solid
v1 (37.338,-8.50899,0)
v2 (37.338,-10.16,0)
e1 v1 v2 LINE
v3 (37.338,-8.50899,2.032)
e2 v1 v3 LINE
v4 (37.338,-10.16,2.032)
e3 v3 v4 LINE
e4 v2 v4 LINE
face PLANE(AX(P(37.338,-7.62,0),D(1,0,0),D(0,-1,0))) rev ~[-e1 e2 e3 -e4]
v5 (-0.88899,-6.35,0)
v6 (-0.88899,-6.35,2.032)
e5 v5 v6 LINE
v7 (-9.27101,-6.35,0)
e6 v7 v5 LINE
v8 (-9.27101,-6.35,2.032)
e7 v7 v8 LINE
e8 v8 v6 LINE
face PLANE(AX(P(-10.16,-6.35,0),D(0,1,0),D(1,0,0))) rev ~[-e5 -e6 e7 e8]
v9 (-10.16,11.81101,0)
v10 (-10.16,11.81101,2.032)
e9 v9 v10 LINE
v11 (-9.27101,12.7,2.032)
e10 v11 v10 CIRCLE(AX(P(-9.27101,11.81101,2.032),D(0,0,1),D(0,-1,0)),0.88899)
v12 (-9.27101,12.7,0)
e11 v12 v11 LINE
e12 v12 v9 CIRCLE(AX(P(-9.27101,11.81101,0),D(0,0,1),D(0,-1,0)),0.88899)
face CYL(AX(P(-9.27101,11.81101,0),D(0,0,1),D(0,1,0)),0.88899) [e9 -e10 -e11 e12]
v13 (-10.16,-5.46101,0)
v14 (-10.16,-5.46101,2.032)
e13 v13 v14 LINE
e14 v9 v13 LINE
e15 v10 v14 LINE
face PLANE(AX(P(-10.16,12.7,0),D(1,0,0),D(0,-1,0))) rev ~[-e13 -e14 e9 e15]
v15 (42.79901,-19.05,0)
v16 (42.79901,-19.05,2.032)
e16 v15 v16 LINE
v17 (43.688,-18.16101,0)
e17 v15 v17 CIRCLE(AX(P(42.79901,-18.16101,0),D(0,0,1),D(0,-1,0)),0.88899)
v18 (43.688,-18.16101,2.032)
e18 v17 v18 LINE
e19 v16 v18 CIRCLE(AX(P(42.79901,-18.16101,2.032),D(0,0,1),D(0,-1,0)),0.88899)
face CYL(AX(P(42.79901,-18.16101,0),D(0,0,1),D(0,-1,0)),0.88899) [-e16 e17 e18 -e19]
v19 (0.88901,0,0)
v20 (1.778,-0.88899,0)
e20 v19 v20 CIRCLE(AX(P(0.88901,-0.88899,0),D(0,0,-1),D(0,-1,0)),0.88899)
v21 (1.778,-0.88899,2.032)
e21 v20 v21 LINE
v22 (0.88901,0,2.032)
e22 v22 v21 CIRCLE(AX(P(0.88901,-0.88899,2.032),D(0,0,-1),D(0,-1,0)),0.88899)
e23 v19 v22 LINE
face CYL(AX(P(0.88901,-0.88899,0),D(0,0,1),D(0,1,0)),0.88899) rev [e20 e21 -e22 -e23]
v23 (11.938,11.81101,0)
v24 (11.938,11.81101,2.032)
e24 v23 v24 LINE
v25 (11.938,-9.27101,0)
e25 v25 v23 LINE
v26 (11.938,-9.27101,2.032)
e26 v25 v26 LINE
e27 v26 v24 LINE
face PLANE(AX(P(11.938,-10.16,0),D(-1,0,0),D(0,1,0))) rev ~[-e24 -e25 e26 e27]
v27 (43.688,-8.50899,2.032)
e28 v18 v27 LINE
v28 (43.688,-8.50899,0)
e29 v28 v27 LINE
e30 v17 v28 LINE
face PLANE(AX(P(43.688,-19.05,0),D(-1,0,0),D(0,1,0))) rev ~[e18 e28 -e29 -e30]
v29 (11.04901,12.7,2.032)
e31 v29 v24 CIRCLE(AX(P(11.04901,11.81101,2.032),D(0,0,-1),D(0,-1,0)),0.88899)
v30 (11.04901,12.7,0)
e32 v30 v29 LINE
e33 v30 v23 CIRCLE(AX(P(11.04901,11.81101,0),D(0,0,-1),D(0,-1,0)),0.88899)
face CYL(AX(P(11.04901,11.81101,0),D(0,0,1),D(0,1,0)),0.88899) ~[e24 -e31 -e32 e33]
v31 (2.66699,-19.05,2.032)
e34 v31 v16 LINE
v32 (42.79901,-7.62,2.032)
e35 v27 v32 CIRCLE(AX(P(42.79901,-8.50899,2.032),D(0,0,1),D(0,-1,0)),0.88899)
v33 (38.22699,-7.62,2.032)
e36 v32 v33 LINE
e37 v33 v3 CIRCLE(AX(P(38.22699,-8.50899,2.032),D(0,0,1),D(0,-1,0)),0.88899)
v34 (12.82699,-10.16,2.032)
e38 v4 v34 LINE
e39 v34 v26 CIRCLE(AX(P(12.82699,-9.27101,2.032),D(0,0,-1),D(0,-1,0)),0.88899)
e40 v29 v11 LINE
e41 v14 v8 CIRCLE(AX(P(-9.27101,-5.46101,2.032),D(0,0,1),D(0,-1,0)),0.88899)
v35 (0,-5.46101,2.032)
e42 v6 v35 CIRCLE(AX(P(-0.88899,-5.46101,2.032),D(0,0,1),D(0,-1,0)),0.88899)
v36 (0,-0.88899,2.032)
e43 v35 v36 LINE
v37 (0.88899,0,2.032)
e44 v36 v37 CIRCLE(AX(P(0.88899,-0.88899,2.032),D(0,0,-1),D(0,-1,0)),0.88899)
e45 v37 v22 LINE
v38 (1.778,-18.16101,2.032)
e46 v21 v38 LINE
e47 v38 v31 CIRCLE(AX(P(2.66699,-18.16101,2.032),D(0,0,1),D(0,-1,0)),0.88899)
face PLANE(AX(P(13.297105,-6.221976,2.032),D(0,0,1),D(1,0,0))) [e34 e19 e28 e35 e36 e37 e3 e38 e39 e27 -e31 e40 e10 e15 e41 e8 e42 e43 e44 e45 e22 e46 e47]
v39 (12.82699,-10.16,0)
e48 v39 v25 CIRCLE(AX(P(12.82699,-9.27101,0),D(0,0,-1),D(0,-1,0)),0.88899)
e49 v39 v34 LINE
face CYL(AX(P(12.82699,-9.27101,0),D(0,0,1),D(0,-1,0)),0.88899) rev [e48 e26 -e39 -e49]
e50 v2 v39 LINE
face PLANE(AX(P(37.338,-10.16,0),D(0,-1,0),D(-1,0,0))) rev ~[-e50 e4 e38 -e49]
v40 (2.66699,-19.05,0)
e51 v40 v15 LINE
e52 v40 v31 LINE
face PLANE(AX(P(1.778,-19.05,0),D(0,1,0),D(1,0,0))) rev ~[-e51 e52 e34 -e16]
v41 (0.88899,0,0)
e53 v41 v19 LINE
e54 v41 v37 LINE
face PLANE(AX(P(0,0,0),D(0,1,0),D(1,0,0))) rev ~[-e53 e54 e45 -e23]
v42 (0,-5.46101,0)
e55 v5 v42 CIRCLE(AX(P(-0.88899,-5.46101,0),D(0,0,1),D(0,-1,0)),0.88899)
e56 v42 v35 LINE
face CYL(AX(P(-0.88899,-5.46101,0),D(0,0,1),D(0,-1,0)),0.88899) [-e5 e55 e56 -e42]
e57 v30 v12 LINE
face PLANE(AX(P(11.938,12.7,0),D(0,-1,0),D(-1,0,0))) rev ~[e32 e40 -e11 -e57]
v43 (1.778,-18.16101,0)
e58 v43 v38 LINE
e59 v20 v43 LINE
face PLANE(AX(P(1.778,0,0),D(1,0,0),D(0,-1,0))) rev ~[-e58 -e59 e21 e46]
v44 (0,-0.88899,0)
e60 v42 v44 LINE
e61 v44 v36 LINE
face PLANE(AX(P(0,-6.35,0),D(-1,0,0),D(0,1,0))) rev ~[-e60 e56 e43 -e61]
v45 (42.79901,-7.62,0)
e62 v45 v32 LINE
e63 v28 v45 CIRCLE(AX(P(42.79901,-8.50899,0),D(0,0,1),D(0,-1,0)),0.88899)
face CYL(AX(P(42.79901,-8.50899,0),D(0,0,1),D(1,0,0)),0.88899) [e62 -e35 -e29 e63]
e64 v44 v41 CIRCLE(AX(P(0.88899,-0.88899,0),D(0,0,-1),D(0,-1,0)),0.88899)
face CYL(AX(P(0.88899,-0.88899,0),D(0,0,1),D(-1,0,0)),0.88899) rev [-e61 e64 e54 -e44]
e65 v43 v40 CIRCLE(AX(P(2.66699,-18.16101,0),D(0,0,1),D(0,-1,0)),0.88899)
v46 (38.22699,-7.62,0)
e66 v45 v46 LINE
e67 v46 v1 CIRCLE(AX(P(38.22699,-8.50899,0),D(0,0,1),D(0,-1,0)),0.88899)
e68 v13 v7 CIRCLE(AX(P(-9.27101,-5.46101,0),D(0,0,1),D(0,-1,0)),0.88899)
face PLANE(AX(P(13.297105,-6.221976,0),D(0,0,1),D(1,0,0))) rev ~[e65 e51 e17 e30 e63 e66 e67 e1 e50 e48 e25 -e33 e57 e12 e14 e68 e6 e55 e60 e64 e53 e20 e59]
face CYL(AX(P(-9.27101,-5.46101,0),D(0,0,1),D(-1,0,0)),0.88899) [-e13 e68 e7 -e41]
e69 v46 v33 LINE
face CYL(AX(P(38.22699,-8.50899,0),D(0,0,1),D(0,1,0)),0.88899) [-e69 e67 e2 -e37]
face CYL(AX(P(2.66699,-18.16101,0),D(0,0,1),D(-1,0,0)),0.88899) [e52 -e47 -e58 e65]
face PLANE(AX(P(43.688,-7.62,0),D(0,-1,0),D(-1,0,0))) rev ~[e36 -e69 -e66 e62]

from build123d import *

# Parameters (mm, degrees)
F1_DEPTH = 2.032
F2_R     = 0.88899


# Not quite as in the source:
# - a fillet or chamfer is up to 0.001 mm smaller than in the source, because OpenCascade refuses the exact size


with BuildPart() as f1:
    # F0 (on Top) → F1 (new body)
    with BuildSketch(Plane.XY):
        Polygon((11.938, 12.7), (-10.16, 12.7), (-10.16, -6.35), (0, -6.35), (0, 0), (1.778, 0), (1.778, -19.05), (43.688, -19.05), (43.688, -7.62), (37.338, -7.62), (37.338, -10.16), (11.938, -10.16), align=None)
    extrude(amount=F1_DEPTH)

    # F2 (radius 0.889 in the source; OpenCascade refuses exactly that, so slightly less here)
    f2_edges = [f1.edges().sort_by_distance(p)[0] for p in [
        (-10.16, -6.35, 1.016),
        (0, -6.35, 1.016),
        (0, 0, 1.016),
        (1.778, 0, 1.016),
        (1.778, -19.05, 1.016),
        (-10.16, 12.7, 1.016),
        (37.338, -7.62, 1.016),
        (43.688, -19.05, 1.016),
        (11.938, 12.7, 1.016),
        (11.938, -10.16, 1.016),
        (43.688, -7.62, 1.016),
    ]]
    fillet(f2_edges, radius=F2_R)


solid = f1.part
